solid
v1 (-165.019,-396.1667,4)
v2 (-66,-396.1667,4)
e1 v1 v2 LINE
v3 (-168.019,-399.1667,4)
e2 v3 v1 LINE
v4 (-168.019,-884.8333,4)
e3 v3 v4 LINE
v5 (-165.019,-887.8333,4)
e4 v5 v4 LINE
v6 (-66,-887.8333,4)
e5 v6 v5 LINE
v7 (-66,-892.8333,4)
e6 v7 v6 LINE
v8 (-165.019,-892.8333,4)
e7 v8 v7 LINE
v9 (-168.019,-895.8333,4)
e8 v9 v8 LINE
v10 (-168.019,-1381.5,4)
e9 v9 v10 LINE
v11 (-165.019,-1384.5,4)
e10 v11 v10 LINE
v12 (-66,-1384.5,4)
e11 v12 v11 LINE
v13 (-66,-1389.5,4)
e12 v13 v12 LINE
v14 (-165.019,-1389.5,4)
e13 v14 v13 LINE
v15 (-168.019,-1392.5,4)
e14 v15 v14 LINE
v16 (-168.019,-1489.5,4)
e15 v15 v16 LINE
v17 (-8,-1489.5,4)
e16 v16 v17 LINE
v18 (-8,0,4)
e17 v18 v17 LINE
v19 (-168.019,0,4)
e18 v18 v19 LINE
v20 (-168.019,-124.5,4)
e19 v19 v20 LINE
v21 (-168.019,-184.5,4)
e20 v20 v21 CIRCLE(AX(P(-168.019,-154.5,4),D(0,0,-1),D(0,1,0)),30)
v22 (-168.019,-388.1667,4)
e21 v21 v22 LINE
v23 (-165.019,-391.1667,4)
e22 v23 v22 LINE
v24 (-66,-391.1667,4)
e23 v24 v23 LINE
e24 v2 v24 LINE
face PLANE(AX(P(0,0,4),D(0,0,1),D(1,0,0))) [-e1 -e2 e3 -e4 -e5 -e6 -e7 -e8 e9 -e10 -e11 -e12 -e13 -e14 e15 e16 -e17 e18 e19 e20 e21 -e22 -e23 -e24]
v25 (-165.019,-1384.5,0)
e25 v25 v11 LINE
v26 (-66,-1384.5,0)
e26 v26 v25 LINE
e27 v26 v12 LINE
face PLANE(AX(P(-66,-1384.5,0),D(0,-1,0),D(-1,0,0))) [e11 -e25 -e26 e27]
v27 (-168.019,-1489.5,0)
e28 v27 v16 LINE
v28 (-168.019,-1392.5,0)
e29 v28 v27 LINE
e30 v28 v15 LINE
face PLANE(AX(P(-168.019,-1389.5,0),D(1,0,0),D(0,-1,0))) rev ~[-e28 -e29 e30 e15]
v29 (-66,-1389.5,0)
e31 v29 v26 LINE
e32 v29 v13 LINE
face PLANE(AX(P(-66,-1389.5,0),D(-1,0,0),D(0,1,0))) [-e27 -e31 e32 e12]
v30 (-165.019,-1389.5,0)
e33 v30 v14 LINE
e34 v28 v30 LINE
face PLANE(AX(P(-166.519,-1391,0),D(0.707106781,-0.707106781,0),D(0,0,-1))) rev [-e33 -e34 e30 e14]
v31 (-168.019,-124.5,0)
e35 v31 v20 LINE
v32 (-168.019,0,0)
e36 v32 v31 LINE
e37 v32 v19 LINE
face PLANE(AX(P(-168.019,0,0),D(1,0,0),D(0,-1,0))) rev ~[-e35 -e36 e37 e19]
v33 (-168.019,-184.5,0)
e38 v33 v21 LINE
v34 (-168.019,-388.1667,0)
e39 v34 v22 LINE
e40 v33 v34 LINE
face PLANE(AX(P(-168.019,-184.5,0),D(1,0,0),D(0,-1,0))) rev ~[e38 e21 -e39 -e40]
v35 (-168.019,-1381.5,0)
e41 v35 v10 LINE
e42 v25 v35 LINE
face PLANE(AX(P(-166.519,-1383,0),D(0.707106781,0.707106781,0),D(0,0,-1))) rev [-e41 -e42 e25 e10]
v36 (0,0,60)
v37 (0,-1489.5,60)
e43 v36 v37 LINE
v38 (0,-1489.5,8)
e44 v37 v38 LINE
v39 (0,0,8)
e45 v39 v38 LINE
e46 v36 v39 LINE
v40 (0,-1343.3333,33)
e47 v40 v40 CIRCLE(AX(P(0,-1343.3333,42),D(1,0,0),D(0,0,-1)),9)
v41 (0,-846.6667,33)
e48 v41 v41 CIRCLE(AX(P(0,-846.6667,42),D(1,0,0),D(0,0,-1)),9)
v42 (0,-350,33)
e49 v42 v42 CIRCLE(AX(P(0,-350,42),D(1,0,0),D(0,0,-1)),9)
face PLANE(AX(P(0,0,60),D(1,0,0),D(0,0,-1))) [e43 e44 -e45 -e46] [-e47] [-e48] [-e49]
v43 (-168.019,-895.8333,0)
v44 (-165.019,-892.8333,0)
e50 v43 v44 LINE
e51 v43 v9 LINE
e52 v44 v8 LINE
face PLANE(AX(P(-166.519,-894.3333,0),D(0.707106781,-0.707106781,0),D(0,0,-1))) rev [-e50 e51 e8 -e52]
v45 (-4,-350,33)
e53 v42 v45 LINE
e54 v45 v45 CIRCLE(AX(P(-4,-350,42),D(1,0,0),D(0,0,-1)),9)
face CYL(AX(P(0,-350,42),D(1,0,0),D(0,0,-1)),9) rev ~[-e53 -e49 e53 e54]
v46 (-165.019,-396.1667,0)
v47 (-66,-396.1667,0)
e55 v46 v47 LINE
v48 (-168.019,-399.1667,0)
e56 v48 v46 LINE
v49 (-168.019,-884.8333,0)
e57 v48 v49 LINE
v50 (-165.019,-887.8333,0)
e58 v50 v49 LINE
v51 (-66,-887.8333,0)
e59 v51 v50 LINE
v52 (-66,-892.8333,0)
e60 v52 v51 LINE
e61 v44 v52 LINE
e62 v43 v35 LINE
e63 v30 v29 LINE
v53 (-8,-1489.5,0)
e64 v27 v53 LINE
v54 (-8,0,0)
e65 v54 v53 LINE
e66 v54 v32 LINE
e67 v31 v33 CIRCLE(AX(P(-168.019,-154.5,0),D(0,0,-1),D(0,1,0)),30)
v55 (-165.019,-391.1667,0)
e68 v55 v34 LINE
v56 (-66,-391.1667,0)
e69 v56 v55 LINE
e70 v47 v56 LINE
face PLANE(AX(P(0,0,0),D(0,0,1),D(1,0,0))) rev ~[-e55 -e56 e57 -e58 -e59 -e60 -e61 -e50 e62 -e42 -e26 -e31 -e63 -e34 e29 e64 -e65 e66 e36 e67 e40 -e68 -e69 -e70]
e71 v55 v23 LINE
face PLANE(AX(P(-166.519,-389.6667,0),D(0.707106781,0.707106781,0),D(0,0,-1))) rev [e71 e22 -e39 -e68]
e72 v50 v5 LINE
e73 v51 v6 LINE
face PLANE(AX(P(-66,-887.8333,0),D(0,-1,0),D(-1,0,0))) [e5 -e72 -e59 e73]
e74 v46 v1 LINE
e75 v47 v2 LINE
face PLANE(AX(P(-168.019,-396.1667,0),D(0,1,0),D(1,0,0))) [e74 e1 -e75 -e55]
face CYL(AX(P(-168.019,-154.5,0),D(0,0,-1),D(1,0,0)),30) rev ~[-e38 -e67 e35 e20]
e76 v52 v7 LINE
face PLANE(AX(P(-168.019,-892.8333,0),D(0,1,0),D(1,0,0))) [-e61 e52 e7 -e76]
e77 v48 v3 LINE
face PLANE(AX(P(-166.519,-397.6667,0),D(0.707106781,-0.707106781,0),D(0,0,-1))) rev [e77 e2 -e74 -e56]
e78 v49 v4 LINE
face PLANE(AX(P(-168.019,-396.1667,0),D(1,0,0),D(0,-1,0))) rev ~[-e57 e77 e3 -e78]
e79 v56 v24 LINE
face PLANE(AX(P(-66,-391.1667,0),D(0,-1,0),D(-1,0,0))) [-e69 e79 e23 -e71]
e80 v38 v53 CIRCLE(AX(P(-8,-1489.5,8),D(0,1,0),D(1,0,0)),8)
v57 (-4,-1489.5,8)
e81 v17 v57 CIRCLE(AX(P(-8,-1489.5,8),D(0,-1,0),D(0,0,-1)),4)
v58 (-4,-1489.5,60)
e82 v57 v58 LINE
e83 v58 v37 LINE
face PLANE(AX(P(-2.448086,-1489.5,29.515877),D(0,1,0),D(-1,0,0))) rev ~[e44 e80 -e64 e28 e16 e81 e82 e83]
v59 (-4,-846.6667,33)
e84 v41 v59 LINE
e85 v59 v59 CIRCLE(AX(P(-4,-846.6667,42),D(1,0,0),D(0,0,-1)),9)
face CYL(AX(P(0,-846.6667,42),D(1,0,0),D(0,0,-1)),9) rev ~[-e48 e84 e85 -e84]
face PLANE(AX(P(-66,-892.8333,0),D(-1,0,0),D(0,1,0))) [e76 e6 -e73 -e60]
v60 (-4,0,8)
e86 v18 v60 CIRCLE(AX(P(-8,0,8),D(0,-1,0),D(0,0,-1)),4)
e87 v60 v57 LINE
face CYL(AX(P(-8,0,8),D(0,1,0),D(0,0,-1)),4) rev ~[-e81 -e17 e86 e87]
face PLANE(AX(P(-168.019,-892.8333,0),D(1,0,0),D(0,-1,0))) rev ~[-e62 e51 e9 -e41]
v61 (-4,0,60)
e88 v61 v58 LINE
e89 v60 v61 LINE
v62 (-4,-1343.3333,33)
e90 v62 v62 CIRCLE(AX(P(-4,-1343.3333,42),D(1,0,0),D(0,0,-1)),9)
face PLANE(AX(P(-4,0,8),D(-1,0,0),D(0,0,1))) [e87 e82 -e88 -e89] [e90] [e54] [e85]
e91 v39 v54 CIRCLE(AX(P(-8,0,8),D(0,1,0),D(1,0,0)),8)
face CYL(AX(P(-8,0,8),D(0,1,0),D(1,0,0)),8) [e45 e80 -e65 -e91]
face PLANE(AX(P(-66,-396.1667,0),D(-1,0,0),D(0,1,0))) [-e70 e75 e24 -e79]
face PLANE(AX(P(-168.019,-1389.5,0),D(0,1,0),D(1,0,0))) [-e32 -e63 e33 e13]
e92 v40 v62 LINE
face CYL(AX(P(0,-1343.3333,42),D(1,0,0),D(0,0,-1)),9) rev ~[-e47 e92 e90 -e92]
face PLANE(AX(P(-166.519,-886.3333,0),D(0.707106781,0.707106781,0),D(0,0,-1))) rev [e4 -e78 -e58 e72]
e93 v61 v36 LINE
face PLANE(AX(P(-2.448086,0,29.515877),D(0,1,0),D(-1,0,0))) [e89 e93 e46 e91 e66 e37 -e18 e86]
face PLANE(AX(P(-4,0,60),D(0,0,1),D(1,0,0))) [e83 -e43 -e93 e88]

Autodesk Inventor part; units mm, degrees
ref_plane "YZ Plane" through (0, 0, 0) normal (1, 0, 0) x (0, 1, 0)
ref_plane "XZ Plane" through (0, 0, 0) normal (0, 1, 0) x (-1, 0, 0)
ref_plane "XY Plane" through (0, 0, 0) normal (0, 0, 1) x (1, 0, 0)
sketch "Sketch1" plane through (0, 0, 0) normal (0, 0, 1) x (1, 0, 0)
  line L0 (0, 0) -> (-168.019, 0)
  line L1 (-168.019, 0) -> (-168.019, -1489.5)
  line L2 (-168.019, -1489.5) -> (0, -1489.5)
  line L3 (0, -1489.5) -> (0, 0)
  line L4 (-168.019, -1389.5) -> (-66, -1389.5)
  line L5 (-66, -1389.5) -> (-66, -1384.5)
  line L6 (-66, -1384.5) -> (-168.019, -1384.5)
  line L7 (-168.019, -1384.5) -> (-168.019, -1389.5)
  line L8 (-168.019, -892.8333) -> (-66, -892.8333)
  line L9 (-66, -892.8333) -> (-66, -887.8333)
  line L10 (-66, -887.8333) -> (-168.019, -887.8333)
  line L11 (-168.019, -887.8333) -> (-168.019, -892.8333)
  line L12 (-168.019, -396.1667) -> (-66, -396.1667)
  line L13 (-66, -396.1667) -> (-66, -391.1667)
  line L14 (-66, -391.1667) -> (-168.019, -391.1667)
  line L15 (-168.019, -391.1667) -> (-168.019, -396.1667)
  circle A0 centre (-168.019, -154.5) radius 30
  point P0 (-168.019, -396.1667)
  point P1 (-168.019, -124.5)
  point P2 (-168.019, -184.5)
  dimension "d0" = 1489.5
  dimension "d1" = 168.019
  dimension "d2" = 5
  dimension "d4" = 100
  dimension "d7" = 496.6667
  dimension "d23" = 66
  dimension "d28" = 60
  dimension "d29" = 1335
extrude "Plate1" add sketch "Sketch1" along normal blind 4 contours L3 L2 L1 L4 L5 L6 L8 L9 L10 L12 L13 L14 A0 L0
sketch "Sketch2" plane through (-4, 0, 0) normal (1, 0, 0) x (0, 1, 0)
  line L0 (-1489.5, 0) -> (0, 0)
  line L1 (0, 0) -> (0, 60)
  line L2 (0, 60) -> (-1489.5, 60)
  line L3 (-1489.5, 60) -> (-1489.5, 0)
edge flange "Flange1" height 60 angle 90 thickness 4 bend radius 4 thickness toward (1, 0, 0) relief tear relief width 4 relief depth 2 edges at (0, -744.75, 4) wall of the first edge with corners at (-4, -1489.5, 0) (-4, 0, 0) (-4, 0, 60) (-4, -1489.5, 60)
bend "Bend1"
corner "Corner1"
chamfer "Corner Chamfer1" distance 3 angle 45 6 edges at (-168.019, -1389.5, 2) (-168.019, -1384.5, 2) (-168.019, -892.8333, 2) (-168.019, -887.8333, 2) (-168.019, -391.1667, 2) (-168.019, -396.1667, 2)
sketch "Sketch4" plane through (0, -1489.5, 60) normal (1, 0, 0) x (0, 0, -1)
  line L0 (52, 0) -> (52, 1489.5) construction
  line L1 (0, 1489.5) -> (52, 1489.5) construction
  line L2 (0, 0) -> (0, 1489.5) construction
  line L3 (52, 0) -> (0, 0) construction
  circle A0 centre (18, 1139.5) radius 9
  circle A1 centre (18, 642.8333) radius 9
  circle A2 centre (18, 146.1667) radius 9
  point P0 (60, 1489.5)
  dimension "d30" = 18
  dimension "d31" = 18
  dimension "d32" = 350
  dimension "d35" = 496.6667
extrude "Cut1" cut sketch "Sketch4" against normal blind 4
equation "\"d0\" = Стрингер_длина"
equation "\"d1\" = стрингер_глубина_3"
equation "\"d2\" = паз_под_стрингер_толщина"
equation "\"d7\" = Шаг_шпангоутов"
equation "\"d23\" = паз_под_стрингер_глубина - Thickness"
equation "\"d28\" = 2 * радиус_выреза_под_сварку"
equation "\"d35\" = Шаг_шпангоутов"
equation "\"d40\" = Thickness"
equation "\"d12\" = Thickness"
equation "\"d13\" = BendReliefWidth"
equation "\"d14\" = BendReliefDepth"
equation "\"d15\" = MinimumRemnant"
equation "\"d16\" = TransitionRadius"
equation "\"d17\" = ребро_усилителей"
equation "\"d19\" = BendRadius"
equation "\"d20\" = CornerReliefSize"
equation "\"d21\" = GapSize"
equation "\"d22\" = JacobiRadiusSize"
equation "\"BendRadius\" = Thickness"
equation "\"BendReliefWidth\" = Thickness"
equation "\"BendReliefDepth\" = 0.5 * Thickness"
equation "\"CornerReliefSize\" = 4 * Thickness"
equation "\"MinimumRemnant\" = 2 * Thickness"
equation "\"TransitionRadius\" = BendRadius"
equation "\"JacobiRadiusSize\" = BendRadius"
equation "\"GapSize\" = Thickness"
equation "\"Стрингер_длина\" = 1489.5"
equation "\"стрингер_глубина_3\" = 168.018988"
equation "\"паз_под_стрингер_толщина\" = 5"
equation "\"Шаг_шпангоутов\" = 496.666667"
equation "\"паз_под_стрингер_глубина\" = 70"
equation "\"Thickness\" = 4"
equation "\"радиус_выреза_под_сварку\" = 30"
equation "\"ребро_усилителей\" = 60"
properties part number "GBK 0104 stringer 3" material "Steel"
